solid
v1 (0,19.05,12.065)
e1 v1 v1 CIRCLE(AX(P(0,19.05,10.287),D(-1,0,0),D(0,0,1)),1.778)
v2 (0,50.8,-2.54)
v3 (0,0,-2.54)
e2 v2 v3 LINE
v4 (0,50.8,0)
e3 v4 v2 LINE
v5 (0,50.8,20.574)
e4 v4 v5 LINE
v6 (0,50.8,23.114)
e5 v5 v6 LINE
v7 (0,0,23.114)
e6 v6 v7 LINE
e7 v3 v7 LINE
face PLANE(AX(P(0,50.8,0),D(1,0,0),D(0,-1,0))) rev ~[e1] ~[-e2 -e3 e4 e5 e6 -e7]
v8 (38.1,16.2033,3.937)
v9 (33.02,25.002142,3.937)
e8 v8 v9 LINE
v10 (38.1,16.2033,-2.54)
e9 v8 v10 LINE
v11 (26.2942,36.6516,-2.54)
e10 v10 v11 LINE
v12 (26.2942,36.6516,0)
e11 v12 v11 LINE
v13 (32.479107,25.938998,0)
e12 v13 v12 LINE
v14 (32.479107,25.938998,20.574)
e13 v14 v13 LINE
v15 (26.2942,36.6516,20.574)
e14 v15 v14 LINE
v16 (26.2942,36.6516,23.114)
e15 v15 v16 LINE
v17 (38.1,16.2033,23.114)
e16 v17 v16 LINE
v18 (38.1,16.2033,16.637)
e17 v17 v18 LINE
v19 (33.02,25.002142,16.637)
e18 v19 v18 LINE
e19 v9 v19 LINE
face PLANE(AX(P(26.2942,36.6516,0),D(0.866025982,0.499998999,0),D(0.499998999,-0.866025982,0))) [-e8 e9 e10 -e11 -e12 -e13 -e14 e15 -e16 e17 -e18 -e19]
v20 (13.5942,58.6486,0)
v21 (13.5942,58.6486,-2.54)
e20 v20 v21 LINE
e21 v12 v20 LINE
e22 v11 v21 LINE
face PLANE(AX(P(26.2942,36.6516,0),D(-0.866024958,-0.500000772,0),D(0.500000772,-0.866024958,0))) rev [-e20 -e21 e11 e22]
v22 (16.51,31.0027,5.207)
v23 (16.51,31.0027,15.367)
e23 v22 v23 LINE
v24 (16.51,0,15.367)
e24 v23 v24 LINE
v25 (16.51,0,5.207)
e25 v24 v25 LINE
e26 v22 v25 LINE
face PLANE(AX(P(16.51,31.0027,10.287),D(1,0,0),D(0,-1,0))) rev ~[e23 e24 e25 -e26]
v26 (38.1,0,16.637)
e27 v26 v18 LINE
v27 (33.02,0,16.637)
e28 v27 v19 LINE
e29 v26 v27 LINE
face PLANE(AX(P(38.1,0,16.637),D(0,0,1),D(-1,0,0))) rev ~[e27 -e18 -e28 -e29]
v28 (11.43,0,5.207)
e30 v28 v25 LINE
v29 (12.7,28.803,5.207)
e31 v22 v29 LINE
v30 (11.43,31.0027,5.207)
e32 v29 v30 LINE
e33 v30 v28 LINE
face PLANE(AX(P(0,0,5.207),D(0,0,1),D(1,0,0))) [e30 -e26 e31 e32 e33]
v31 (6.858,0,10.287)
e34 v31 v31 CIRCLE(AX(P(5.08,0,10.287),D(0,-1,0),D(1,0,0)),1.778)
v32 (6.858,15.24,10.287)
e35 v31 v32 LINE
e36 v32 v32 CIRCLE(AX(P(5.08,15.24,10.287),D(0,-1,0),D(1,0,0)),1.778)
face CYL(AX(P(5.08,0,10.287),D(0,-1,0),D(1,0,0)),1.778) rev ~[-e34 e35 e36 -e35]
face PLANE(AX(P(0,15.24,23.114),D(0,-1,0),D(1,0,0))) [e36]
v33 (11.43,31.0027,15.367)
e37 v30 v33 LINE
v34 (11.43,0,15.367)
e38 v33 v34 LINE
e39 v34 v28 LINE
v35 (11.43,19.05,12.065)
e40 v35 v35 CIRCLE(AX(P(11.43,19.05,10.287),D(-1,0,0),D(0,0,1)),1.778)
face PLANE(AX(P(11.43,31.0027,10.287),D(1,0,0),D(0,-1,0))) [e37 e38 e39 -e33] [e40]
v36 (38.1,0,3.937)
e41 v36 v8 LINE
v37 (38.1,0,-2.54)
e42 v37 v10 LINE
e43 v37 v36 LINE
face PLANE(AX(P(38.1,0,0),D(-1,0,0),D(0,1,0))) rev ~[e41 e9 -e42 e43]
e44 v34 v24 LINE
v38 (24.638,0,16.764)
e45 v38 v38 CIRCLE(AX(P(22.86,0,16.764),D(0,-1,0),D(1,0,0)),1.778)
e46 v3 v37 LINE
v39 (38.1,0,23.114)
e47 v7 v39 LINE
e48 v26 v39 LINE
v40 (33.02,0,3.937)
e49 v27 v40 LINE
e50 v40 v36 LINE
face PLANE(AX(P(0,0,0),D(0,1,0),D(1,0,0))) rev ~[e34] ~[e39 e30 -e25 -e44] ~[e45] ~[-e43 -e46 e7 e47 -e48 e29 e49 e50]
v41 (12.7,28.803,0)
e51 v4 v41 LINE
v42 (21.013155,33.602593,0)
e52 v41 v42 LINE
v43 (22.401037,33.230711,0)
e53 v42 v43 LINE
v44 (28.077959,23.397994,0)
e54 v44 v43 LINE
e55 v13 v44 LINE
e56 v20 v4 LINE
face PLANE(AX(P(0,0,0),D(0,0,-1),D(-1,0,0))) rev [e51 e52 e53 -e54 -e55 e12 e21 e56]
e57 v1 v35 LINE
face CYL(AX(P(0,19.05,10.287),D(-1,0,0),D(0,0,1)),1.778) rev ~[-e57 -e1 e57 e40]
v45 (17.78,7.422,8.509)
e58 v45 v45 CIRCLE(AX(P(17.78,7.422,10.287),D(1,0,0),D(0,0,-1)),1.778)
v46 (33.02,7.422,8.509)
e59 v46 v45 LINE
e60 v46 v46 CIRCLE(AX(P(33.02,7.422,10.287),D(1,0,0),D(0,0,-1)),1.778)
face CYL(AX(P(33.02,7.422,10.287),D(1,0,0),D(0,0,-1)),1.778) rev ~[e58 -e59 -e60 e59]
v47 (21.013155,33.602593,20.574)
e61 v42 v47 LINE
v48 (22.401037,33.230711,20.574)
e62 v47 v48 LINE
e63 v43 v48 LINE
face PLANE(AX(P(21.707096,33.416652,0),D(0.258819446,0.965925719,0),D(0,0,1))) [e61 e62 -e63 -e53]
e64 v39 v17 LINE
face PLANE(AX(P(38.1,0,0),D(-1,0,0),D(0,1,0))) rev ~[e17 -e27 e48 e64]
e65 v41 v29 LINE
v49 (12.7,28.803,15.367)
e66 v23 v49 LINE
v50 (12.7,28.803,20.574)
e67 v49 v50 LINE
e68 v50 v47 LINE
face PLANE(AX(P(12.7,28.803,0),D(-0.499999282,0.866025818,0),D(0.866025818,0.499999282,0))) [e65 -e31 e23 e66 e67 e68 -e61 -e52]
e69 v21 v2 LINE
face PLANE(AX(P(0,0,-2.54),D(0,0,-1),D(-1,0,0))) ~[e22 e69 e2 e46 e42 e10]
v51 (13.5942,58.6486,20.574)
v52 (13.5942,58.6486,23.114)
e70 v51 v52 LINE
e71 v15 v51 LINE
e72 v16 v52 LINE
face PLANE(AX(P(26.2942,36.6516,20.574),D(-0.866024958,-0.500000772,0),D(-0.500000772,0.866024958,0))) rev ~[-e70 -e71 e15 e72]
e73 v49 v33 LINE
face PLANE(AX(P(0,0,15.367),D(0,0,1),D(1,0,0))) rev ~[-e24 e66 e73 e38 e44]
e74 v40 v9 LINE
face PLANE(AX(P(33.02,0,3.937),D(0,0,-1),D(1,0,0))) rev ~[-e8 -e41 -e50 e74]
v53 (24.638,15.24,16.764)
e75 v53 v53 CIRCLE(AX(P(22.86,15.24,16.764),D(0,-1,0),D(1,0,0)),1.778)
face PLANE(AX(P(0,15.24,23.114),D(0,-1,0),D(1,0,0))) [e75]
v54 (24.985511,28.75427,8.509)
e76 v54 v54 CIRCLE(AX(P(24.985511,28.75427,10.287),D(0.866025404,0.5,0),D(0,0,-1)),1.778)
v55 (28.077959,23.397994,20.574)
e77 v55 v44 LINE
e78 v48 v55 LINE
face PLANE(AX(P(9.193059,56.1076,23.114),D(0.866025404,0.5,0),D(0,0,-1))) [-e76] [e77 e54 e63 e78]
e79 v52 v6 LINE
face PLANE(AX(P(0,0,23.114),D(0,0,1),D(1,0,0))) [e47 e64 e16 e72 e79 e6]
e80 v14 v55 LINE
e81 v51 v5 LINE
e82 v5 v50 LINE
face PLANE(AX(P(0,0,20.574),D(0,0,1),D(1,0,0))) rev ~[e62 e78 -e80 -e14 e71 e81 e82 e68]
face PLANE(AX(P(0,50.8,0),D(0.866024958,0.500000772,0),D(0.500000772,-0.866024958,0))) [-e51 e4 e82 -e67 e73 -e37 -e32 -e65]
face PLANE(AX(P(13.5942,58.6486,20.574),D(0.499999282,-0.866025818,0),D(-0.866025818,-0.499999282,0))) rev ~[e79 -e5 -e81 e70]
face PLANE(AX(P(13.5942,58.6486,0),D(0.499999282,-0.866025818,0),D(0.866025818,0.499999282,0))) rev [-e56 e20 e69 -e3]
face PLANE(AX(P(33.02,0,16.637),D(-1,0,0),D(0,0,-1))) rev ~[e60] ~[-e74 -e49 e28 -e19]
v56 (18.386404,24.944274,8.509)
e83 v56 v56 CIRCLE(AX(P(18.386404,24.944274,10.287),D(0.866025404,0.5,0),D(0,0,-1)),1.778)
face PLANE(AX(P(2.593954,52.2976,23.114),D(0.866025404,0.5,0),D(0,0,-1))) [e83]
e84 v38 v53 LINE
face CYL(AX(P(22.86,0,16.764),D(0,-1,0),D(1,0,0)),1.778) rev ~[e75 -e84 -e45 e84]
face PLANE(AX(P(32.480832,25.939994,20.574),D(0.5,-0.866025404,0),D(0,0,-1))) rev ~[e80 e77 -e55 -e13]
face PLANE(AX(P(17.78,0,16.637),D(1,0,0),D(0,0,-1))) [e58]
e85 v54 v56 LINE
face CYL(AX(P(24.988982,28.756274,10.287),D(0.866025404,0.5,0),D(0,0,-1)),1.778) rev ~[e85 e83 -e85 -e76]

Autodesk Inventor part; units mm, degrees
ref_plane "YZ Plane" through (0, 0, 0) normal (1, 0, 0) x (0, 1, 0)
ref_plane "XZ Plane" through (0, 0, 0) normal (0, 1, 0) x (-1, 0, 0)
sketch "Sketch1" plane through (0, 0, 0) normal (0, 0, 1) x (1, 0, 0)
  line L0 (0, 0) -> (38.1, 0)
  line L1 (38.1, 0) -> (38.1, 16.2033)
  line L2 (0, 50.8) -> (0, 0)
  line L3 (0, 50.8) -> (13.5942, 58.6486)
  line L4 (0, 50.8) -> (12.7, 28.803)
  line L5 (12.7, 28.803) -> (26.2942, 36.6516)
  line L6 (26.2942, 36.6516) -> (13.5942, 58.6486)
  line L7 (26.2942, 36.6516) -> (38.1, 16.2033)
  dimension "d0" = 15.6972
  dimension "d1" = 25.4
  dimension "d2" = 38.1
  dimension "d3" = 50.8
  dimension "d4" = 120
extrude "Extrusion1" add sketch "Sketch1" along normal blind 20.574 contours L2 L4 L5 L7 L1 L0
sketch "Sketch2" plane through (0, 0, 20.574) normal (0, 0, 1) x (1, 0, 0)
  line L0 (0, 50.8) -> (0, 0) projected
  line L1 (0, 0) -> (38.1, 0) projected
  line L2 (38.1, 0) -> (38.1, 16.2033) projected
  line L3 (38.1, 16.2033) -> (26.2942, 36.6516) projected
  line L4 (26.2942, 36.6516) -> (12.7, 28.803) projected
  line L5 (12.7, 28.803) -> (0, 50.8) projected
  line L6 (26.2942, 36.6516) -> (13.5942, 58.6486)
  line L7 (13.5942, 58.6486) -> (0, 50.8)
  line L8 (38.1, 16.2033) -> (26.2942, 36.6516) projected
extrude "Extrusion2" add sketch "Sketch2" along normal blind 2.54
ref_plane "Work Plane1" through (0, 0, 10.287) normal (0, 0, -1) x (-1, 0, 0)
mirror "Mirror1" about plane through (0, 0, 10.287) normal (0, 0, -1) of "Extrusion2"
sketch "Sketch3" plane through (0, 0, 23.114) normal (0, -1, 0) x (1, 0, 0)
  line L0 (38.1, -25.654) -> (38.1, 0) projected
  line L1 (38.1, -6.477) -> (33.02, -6.477)
  line L2 (33.02, -6.477) -> (33.02, -19.177)
  line L3 (33.02, -19.177) -> (38.1, -19.177)
  line L4 (38.1, -19.177) -> (38.1, -6.477)
  point P0 (0, -23.114)
  point P1 (38.1, -12.827)
  point P2 (38.1, -19.177)
  dimension "d9" = 12.7
  dimension "d10" = 5.08
  dimension "d11" = 6.35
extrude "Extrusion3" cut sketch "Sketch3" against normal blind 33.9725
sketch "Sketch4" plane through (33.02, 0, 16.637) normal (1, 0, 0) x (0, 0, -1)
  circle A0 centre (6.35, 7.422) radius 1.778 projected
  point P0 (16.637, 0)
extrude "Extrusion4" cut sketch "Sketch4" against normal blind 15.24
ref_plane "Work Plane2" through (0, 0, 10.287) normal (0, 0, 1) x (1, 0, 0)
sketch "Sketch5" plane through (0, 0, 10.287) normal (0, 0, 1) x (1, 0, 0)
  line L0 (26.2942, 36.6516) -> (12.7, 28.803) projected
  line L1 (16.51, 31.0027) -> (11.43, 31.0027)
  line L2 (12.7, 28.803) -> (0, 50.8) projected
  line L3 (16.51, 31.0027) -> (16.51, 0)
  line L4 (0, 0) -> (38.1, 0) projected
  line L5 (11.43, 31.0027) -> (11.43, 0)
  line L6 (16.51, 0) -> (11.43, 0)
  dimension "d16" = 5.08
extrude "Extrusion5" cut sketch "Sketch5" along normal mid plane 10.16 contours L3 L4 L5 L2 L0
sketch "Sketch6" plane through (13.5942, 58.6486, 23.114) normal (0.8660254, 0.5, 0) x (0, 0, -1)
  line L0 (23.114, -25.4) -> (2.54, -25.4)
  line L1 (2.54, -25.4) -> (2.54, -37.7698)
  line L2 (2.54, -37.7698) -> (23.114, -37.7698)
  line L3 (23.114, -37.7698) -> (23.114, -25.4)
  point P0 (23.114, -43.9941)
  dimension "d19" = 12.3698
extrude "Extrusion6" cut sketch "Sketch6" against normal blind 5.08
chamfer "Chamfer1" distance 1.016 angle 45 1 edges at (21.893, 34.1106, 10.287)
sketch "Sketch7" plane through (9.1948, 56.1086, 23.114) normal (0.8660254, 0.5, 0) x (0, 0, -1)
  circle A0 centre (12.827, -31.5849) radius 1.778
  line L0 (2.54, -25.4) -> (2.54, -26.416) projected
  line L1 (2.54, -37.7698) -> (2.54, -26.416) projected
  line L2 (23.114, -37.7698) -> (2.54, -37.7698) projected
  line L3 (2.54, -25.4) -> (2.54, -37.7698)
  line L4 (2.54, -25.4) -> (2.54, -37.7698)
  point P0 (23.114, -43.9941)
  point P1 (2.54, -31.5849)
  point P2 (12.827, -37.7698)
  dimension "d25" = 3.556
extrude "Extrusion7" cut sketch "Sketch7" against normal blind 7.62
sketch "Sketch8" plane through (0, 0, 23.114) normal (-1, 0, 0) x (0, 0, 1)
  circle A0 centre (-12.827, 19.05) radius 1.778 projected
  point P0 (-23.114, 0)
extrude "Extrusion8" cut sketch "Sketch8" against normal blind 15.24
sketch "Sketch9" plane through (0, 0, 23.114) normal (0, -1, 0) x (1, 0, 0)
  circle A0 centre (5.08, -12.827) radius 1.778 projected
  circle A1 centre (22.86, -6.35) radius 1.778 projected
  circle A2 centre (22.86, -6.35) radius 1.778
  circle A3 centre (5.08, -12.827) radius 1.778
  point P0 (0, -23.114)
extrude "Extrusion9" cut sketch "Sketch9" against normal blind 15.24
equation "\"d11\" = 0.5 * d9"
properties part number "PALM 1"
